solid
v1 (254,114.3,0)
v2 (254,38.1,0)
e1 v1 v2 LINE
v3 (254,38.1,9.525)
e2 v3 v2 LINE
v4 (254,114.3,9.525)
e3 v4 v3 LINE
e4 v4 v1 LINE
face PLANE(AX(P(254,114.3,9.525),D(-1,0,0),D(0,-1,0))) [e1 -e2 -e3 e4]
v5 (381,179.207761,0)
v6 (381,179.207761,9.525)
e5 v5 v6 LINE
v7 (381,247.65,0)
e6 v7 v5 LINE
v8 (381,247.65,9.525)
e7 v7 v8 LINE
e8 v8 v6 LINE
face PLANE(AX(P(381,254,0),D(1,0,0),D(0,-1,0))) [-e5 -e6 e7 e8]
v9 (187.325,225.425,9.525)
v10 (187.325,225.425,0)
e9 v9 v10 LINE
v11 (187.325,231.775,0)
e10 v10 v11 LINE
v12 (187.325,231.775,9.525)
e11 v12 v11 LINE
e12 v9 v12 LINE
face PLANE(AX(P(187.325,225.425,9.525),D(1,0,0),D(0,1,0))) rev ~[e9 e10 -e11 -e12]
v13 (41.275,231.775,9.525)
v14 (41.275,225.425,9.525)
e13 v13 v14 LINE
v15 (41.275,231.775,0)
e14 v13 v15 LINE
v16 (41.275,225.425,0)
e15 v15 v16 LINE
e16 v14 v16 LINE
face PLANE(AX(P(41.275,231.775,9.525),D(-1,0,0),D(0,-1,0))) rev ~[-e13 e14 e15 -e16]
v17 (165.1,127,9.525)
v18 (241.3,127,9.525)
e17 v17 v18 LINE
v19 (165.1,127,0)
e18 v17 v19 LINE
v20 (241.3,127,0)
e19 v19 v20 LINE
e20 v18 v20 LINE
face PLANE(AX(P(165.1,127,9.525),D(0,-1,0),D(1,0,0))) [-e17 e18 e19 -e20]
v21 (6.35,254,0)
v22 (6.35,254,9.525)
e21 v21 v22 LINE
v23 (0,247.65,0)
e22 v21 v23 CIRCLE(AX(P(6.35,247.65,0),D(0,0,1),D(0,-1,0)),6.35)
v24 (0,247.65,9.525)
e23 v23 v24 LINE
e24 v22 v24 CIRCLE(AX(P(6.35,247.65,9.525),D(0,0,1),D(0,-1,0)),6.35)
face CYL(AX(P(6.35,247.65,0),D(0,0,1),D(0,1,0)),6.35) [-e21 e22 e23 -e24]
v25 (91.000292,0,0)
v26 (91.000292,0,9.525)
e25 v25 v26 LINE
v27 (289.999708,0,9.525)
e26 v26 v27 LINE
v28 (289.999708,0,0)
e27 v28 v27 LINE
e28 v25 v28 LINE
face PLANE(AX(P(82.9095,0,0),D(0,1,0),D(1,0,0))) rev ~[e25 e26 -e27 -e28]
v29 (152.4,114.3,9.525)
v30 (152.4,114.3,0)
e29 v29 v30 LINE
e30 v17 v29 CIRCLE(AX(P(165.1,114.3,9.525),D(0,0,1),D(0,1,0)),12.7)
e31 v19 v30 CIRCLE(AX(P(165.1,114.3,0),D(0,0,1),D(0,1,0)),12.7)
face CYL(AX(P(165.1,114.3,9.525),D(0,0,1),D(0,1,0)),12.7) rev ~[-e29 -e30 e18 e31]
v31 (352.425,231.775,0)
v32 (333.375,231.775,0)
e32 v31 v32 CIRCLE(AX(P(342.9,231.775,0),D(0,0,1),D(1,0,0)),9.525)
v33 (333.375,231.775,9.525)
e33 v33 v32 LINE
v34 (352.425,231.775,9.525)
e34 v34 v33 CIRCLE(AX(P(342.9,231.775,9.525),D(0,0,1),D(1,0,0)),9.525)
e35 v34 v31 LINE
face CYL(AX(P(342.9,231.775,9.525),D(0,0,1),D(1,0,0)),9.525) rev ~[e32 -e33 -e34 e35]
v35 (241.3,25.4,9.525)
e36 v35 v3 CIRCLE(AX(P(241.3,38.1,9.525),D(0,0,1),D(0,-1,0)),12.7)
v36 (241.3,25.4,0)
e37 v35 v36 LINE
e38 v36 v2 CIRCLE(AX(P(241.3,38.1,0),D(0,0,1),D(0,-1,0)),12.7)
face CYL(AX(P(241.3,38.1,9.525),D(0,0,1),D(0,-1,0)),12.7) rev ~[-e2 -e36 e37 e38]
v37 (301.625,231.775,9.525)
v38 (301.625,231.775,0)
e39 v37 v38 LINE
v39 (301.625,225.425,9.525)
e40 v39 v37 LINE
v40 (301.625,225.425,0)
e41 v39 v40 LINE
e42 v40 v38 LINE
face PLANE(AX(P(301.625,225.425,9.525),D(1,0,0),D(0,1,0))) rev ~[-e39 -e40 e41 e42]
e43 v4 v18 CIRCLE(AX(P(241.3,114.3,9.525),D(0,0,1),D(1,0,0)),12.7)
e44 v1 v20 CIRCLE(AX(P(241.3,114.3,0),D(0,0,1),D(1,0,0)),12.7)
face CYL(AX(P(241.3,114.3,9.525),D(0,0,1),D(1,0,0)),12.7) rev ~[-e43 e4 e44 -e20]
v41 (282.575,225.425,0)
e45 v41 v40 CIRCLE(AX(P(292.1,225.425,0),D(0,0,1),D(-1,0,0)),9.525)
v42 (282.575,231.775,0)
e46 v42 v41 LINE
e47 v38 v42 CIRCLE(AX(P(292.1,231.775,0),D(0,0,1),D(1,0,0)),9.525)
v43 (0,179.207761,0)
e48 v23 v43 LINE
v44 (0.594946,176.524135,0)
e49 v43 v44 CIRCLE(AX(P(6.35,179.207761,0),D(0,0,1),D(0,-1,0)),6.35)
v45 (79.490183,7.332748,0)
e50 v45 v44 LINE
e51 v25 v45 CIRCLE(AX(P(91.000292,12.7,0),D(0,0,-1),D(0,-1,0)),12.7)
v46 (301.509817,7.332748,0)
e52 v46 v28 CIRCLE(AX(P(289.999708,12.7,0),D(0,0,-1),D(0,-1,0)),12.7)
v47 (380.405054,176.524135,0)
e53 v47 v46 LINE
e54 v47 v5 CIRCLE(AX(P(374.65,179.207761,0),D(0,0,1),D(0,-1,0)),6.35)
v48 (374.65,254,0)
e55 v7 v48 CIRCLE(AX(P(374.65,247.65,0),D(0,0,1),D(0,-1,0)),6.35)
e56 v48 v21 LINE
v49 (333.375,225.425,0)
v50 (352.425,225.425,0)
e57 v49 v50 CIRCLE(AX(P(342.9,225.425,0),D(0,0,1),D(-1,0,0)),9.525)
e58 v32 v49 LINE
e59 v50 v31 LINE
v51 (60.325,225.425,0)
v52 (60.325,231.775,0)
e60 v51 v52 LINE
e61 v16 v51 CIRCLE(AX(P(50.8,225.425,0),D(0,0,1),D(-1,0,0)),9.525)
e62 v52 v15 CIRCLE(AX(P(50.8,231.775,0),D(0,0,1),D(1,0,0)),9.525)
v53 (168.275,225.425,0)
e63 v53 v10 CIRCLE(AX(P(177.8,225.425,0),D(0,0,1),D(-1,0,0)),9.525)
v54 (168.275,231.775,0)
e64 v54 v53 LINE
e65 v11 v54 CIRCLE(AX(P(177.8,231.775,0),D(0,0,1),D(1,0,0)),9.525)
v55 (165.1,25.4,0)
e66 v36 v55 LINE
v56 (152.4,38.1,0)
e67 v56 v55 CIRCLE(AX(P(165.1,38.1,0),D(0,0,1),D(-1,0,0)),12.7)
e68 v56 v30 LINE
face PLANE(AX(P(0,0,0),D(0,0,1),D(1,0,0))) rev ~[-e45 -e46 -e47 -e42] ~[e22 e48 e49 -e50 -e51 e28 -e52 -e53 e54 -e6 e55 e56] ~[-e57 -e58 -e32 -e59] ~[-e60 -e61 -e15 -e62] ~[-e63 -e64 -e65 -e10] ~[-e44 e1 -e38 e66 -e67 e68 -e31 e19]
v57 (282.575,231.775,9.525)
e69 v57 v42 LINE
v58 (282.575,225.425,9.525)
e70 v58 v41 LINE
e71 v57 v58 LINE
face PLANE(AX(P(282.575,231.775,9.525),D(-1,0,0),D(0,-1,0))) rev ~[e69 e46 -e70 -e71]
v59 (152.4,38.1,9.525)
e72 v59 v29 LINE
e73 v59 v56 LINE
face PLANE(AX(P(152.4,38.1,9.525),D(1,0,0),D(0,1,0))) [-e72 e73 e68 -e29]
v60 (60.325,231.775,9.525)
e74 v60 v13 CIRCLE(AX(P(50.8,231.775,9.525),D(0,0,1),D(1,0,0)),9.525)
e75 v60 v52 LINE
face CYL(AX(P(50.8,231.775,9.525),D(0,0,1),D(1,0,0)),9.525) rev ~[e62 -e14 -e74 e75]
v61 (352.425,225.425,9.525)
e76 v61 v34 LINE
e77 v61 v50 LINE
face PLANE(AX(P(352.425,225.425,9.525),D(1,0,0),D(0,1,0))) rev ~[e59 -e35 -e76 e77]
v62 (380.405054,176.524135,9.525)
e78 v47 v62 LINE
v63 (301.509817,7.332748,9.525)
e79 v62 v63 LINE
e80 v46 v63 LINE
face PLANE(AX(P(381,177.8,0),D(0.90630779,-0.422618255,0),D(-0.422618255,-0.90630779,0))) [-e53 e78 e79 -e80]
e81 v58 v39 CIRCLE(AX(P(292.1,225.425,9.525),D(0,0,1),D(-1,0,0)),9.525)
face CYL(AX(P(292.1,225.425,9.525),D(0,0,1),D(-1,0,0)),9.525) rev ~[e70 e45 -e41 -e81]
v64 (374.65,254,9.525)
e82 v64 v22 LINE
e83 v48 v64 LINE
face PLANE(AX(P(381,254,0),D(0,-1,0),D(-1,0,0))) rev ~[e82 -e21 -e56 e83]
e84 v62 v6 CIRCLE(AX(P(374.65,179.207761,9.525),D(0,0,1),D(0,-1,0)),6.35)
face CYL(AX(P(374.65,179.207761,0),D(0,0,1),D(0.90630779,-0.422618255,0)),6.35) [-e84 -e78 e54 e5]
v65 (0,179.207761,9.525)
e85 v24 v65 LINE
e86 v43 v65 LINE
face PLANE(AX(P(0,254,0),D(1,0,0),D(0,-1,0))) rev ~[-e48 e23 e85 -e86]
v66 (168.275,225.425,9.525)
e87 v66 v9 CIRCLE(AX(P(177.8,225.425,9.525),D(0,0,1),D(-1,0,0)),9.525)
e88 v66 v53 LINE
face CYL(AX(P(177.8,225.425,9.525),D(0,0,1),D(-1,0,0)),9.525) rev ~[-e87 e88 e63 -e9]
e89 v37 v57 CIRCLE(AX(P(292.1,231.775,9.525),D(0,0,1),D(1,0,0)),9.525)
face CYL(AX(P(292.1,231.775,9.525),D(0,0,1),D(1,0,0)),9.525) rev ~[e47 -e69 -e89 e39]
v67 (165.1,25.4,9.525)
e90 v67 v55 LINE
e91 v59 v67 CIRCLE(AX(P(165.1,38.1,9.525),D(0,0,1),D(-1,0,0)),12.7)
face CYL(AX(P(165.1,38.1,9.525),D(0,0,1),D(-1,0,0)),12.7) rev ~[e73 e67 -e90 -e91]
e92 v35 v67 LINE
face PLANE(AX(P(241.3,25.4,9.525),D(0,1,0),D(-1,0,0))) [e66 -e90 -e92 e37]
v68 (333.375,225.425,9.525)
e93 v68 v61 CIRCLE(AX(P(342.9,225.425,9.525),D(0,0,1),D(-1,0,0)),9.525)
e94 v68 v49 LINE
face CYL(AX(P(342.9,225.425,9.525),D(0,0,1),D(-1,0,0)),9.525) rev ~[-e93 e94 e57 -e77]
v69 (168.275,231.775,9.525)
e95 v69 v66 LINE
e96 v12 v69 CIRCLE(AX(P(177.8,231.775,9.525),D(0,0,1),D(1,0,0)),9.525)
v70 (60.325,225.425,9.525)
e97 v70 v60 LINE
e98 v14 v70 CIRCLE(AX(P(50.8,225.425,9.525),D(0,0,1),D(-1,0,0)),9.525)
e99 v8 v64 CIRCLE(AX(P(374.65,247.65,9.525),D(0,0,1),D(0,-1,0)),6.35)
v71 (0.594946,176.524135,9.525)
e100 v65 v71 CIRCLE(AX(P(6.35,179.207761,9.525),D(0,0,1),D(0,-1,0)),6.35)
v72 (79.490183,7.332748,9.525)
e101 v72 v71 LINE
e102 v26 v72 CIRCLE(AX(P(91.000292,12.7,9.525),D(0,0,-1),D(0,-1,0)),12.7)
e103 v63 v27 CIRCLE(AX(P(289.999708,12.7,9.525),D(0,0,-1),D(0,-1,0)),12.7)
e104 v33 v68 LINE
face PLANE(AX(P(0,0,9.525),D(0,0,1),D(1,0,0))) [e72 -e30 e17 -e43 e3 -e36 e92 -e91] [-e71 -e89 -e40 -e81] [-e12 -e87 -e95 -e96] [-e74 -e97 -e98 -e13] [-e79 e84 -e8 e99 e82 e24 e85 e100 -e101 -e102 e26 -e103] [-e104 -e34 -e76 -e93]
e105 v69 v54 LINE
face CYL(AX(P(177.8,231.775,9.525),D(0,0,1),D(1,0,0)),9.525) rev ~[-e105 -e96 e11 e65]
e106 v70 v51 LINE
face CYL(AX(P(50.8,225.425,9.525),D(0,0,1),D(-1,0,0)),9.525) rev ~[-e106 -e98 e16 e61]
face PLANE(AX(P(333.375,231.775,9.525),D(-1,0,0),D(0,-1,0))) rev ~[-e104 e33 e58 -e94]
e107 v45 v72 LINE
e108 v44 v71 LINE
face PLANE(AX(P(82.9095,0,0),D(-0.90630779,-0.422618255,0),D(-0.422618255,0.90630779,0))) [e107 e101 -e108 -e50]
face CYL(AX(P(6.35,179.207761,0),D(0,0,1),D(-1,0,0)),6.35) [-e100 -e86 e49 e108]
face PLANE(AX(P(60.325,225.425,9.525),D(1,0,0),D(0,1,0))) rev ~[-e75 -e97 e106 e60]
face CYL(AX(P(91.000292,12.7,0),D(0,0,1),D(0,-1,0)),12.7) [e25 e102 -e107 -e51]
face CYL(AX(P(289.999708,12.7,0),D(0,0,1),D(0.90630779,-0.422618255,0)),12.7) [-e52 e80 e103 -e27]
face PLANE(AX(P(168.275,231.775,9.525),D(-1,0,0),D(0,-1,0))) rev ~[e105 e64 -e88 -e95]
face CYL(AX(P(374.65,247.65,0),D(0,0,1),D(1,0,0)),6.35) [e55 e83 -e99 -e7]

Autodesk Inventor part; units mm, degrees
ref_plane "YZ Plane" through (0, 0, 0) normal (1, 0, 0) x (0, 1, 0)
ref_plane "XZ Plane" through (0, 0, 0) normal (0, 1, 0) x (-1, 0, 0)
ref_plane "XY Plane" through (0, 0, 0) normal (0, 0, 1) x (1, 0, 0)
sketch "Sketch1" plane through (0, 0, 0) normal (0, 0, 1) x (1, 0, 0)
  line L0 (0, 0) -> (298.0905, 0) construction
  line L1 (381, 254) -> (0, 254)
  line L2 (0, 254) -> (0, 0) construction
  line L3 (0, 254) -> (0, 0) construction
  line L4 (381, 254) -> (381, 177.8)
  line L5 (381, 177.8) -> (298.0905, 0)
  line L6 (0, 254) -> (0, 177.8)
  line L7 (82.9095, 0) -> (0, 177.8)
  line L8 (82.9095, 0) -> (298.0905, 0)
  dimension "d42" = 254
  dimension "d79" = 381
  dimension "d97" = 65
  dimension "d98" = 76.2
  dimension "d99" = 25
extrude "Plate1" add sketch "Sketch1" along normal blind 9.525
fillet "Corner Round1" radius 12.7 2 edges at (298.0905, 0, 4.7625) (82.9095, 0, 4.7625)
ref_plane "Work Plane1" through (0, 177.8, -13.208) normal (0, 1, 0) x (1, 0, 0)
sketch "Sketch10" plane through (0, 177.8, 9.525) normal (0, 0, 1) x (1, 0, 0)
  line L0 (342.9, 53.975) -> (342.9, 47.625) construction
  line L1 (333.375, 53.975) -> (333.375, 47.625)
  line L2 (352.425, 47.625) -> (352.425, 53.975)
  arc A0 (352.425, 53.975) -> (333.375, 53.975) centre (342.9, 53.975) ccw
  arc A1 (333.375, 47.625) -> (352.425, 47.625) centre (342.9, 47.625) ccw
  line L3 (50.8, 53.975) -> (50.8, 47.625) construction
  line L4 (41.275, 53.975) -> (41.275, 47.625)
  line L5 (60.325, 47.625) -> (60.325, 53.975)
  arc A2 (60.325, 53.975) -> (41.275, 53.975) centre (50.8, 53.975) ccw
  arc A3 (41.275, 47.625) -> (60.325, 47.625) centre (50.8, 47.625) ccw
  line L6 (0, 76.2) -> (381, 76.2) projected
  line L7 (381, 76.2) -> (381, 0) projected
  arc A4 (282.575, 47.625) -> (301.625, 47.625) centre (292.1, 47.625) ccw
  line L8 (282.575, 53.975) -> (282.575, 47.625)
  arc A5 (301.625, 53.975) -> (282.575, 53.975) centre (292.1, 53.975) ccw
  line L9 (301.625, 47.625) -> (301.625, 53.975)
  arc A6 (187.325, 53.975) -> (168.275, 53.975) centre (177.8, 53.975) ccw
  line L10 (187.325, 47.625) -> (187.325, 53.975)
  arc A7 (168.275, 47.625) -> (187.325, 47.625) centre (177.8, 47.625) ccw
  line L11 (168.275, 53.975) -> (168.275, 47.625)
  line L12 (0, 0) -> (0, 76.2) projected
  point P0 (342.9, 50.8)
  point P1 (50.8, 50.8)
  point P2 (41.275, 50.8)
  point P3 (168.275, 50.8)
  dimension "d83" = 19.05
  dimension "d85" = 6.35
  dimension "d100" = 25.4
  dimension "d101" = 38.1
  dimension "d104" = 50.8
  dimension "d111" = 127
  dimension "d116" = 50.8
extrude "Cut4" cut sketch "Sketch10" against normal blind 9.525
sketch "Sketch11" plane through (0, 0, 9.525) normal (0, 0, 1) x (1, 0, 0)
  line L0 (165.1, 127) -> (241.3, 127)
  line L1 (254, 114.3) -> (254, 38.1)
  line L2 (241.3, 25.4) -> (165.1, 25.4)
  line L3 (152.4, 38.1) -> (152.4, 114.3)
  line L4 (152.4, 127) -> (254, 25.4) construction
  line L5 (254, 127) -> (152.4, 25.4) construction
  arc A0 (254, 114.3) -> (241.3, 127) centre (241.3, 114.3) ccw
  arc A1 (165.1, 127) -> (152.4, 114.3) centre (165.1, 114.3) ccw
  arc A2 (152.4, 38.1) -> (165.1, 25.4) centre (165.1, 38.1) ccw
  arc A3 (241.3, 25.4) -> (254, 38.1) centre (241.3, 38.1) ccw
  line L6 (289.9997, 0) -> (0, 0) projected
  line L7 (0, 0) -> (0, 254) projected
  point P0 (203.2, 76.2)
  point P1 (12.7, 0)
  point P2 (0, 12.7)
  point P3 (0, 155.067)
  dimension "d90" = 101.6
  dimension "d91" = 101.6
  dimension "d92" = 12.7
  dimension "d93" = 25.4
  dimension "d94" = 152.4
extrude "Cut5" cut sketch "Sketch11" against normal blind 9.525
fillet "Corner Round4" radius 6.35 4 edges at (381, 254, 4.7625) (381, 177.8, 4.7625) (0, 254, 4.7625) (0, 177.8, 4.7625)
equation "\"d88\" = Thickness"
equation "\"d95\" = Thickness"
equation "\"d15\" = Thickness"
equation "\"BendReliefWidth\" = Thickness"
equation "\"BendReliefDepth\" = 0.5 * Thickness"
equation "\"CornerReliefSize\" = 4 * Thickness"
equation "\"MinimumRemnant\" = 2 * Thickness"
equation "\"TransitionRadius\" = BendRadius"
equation "\"JacobiRadiusSize\" = Thickness"
equation "\"GapSize\" = Thickness"
equation "\"Thickness\" = 9.525"
equation "\"BendRadius\" = 13.208"
properties part number "Front Hitch Model-1_Sheet-RH" material "SS304"
